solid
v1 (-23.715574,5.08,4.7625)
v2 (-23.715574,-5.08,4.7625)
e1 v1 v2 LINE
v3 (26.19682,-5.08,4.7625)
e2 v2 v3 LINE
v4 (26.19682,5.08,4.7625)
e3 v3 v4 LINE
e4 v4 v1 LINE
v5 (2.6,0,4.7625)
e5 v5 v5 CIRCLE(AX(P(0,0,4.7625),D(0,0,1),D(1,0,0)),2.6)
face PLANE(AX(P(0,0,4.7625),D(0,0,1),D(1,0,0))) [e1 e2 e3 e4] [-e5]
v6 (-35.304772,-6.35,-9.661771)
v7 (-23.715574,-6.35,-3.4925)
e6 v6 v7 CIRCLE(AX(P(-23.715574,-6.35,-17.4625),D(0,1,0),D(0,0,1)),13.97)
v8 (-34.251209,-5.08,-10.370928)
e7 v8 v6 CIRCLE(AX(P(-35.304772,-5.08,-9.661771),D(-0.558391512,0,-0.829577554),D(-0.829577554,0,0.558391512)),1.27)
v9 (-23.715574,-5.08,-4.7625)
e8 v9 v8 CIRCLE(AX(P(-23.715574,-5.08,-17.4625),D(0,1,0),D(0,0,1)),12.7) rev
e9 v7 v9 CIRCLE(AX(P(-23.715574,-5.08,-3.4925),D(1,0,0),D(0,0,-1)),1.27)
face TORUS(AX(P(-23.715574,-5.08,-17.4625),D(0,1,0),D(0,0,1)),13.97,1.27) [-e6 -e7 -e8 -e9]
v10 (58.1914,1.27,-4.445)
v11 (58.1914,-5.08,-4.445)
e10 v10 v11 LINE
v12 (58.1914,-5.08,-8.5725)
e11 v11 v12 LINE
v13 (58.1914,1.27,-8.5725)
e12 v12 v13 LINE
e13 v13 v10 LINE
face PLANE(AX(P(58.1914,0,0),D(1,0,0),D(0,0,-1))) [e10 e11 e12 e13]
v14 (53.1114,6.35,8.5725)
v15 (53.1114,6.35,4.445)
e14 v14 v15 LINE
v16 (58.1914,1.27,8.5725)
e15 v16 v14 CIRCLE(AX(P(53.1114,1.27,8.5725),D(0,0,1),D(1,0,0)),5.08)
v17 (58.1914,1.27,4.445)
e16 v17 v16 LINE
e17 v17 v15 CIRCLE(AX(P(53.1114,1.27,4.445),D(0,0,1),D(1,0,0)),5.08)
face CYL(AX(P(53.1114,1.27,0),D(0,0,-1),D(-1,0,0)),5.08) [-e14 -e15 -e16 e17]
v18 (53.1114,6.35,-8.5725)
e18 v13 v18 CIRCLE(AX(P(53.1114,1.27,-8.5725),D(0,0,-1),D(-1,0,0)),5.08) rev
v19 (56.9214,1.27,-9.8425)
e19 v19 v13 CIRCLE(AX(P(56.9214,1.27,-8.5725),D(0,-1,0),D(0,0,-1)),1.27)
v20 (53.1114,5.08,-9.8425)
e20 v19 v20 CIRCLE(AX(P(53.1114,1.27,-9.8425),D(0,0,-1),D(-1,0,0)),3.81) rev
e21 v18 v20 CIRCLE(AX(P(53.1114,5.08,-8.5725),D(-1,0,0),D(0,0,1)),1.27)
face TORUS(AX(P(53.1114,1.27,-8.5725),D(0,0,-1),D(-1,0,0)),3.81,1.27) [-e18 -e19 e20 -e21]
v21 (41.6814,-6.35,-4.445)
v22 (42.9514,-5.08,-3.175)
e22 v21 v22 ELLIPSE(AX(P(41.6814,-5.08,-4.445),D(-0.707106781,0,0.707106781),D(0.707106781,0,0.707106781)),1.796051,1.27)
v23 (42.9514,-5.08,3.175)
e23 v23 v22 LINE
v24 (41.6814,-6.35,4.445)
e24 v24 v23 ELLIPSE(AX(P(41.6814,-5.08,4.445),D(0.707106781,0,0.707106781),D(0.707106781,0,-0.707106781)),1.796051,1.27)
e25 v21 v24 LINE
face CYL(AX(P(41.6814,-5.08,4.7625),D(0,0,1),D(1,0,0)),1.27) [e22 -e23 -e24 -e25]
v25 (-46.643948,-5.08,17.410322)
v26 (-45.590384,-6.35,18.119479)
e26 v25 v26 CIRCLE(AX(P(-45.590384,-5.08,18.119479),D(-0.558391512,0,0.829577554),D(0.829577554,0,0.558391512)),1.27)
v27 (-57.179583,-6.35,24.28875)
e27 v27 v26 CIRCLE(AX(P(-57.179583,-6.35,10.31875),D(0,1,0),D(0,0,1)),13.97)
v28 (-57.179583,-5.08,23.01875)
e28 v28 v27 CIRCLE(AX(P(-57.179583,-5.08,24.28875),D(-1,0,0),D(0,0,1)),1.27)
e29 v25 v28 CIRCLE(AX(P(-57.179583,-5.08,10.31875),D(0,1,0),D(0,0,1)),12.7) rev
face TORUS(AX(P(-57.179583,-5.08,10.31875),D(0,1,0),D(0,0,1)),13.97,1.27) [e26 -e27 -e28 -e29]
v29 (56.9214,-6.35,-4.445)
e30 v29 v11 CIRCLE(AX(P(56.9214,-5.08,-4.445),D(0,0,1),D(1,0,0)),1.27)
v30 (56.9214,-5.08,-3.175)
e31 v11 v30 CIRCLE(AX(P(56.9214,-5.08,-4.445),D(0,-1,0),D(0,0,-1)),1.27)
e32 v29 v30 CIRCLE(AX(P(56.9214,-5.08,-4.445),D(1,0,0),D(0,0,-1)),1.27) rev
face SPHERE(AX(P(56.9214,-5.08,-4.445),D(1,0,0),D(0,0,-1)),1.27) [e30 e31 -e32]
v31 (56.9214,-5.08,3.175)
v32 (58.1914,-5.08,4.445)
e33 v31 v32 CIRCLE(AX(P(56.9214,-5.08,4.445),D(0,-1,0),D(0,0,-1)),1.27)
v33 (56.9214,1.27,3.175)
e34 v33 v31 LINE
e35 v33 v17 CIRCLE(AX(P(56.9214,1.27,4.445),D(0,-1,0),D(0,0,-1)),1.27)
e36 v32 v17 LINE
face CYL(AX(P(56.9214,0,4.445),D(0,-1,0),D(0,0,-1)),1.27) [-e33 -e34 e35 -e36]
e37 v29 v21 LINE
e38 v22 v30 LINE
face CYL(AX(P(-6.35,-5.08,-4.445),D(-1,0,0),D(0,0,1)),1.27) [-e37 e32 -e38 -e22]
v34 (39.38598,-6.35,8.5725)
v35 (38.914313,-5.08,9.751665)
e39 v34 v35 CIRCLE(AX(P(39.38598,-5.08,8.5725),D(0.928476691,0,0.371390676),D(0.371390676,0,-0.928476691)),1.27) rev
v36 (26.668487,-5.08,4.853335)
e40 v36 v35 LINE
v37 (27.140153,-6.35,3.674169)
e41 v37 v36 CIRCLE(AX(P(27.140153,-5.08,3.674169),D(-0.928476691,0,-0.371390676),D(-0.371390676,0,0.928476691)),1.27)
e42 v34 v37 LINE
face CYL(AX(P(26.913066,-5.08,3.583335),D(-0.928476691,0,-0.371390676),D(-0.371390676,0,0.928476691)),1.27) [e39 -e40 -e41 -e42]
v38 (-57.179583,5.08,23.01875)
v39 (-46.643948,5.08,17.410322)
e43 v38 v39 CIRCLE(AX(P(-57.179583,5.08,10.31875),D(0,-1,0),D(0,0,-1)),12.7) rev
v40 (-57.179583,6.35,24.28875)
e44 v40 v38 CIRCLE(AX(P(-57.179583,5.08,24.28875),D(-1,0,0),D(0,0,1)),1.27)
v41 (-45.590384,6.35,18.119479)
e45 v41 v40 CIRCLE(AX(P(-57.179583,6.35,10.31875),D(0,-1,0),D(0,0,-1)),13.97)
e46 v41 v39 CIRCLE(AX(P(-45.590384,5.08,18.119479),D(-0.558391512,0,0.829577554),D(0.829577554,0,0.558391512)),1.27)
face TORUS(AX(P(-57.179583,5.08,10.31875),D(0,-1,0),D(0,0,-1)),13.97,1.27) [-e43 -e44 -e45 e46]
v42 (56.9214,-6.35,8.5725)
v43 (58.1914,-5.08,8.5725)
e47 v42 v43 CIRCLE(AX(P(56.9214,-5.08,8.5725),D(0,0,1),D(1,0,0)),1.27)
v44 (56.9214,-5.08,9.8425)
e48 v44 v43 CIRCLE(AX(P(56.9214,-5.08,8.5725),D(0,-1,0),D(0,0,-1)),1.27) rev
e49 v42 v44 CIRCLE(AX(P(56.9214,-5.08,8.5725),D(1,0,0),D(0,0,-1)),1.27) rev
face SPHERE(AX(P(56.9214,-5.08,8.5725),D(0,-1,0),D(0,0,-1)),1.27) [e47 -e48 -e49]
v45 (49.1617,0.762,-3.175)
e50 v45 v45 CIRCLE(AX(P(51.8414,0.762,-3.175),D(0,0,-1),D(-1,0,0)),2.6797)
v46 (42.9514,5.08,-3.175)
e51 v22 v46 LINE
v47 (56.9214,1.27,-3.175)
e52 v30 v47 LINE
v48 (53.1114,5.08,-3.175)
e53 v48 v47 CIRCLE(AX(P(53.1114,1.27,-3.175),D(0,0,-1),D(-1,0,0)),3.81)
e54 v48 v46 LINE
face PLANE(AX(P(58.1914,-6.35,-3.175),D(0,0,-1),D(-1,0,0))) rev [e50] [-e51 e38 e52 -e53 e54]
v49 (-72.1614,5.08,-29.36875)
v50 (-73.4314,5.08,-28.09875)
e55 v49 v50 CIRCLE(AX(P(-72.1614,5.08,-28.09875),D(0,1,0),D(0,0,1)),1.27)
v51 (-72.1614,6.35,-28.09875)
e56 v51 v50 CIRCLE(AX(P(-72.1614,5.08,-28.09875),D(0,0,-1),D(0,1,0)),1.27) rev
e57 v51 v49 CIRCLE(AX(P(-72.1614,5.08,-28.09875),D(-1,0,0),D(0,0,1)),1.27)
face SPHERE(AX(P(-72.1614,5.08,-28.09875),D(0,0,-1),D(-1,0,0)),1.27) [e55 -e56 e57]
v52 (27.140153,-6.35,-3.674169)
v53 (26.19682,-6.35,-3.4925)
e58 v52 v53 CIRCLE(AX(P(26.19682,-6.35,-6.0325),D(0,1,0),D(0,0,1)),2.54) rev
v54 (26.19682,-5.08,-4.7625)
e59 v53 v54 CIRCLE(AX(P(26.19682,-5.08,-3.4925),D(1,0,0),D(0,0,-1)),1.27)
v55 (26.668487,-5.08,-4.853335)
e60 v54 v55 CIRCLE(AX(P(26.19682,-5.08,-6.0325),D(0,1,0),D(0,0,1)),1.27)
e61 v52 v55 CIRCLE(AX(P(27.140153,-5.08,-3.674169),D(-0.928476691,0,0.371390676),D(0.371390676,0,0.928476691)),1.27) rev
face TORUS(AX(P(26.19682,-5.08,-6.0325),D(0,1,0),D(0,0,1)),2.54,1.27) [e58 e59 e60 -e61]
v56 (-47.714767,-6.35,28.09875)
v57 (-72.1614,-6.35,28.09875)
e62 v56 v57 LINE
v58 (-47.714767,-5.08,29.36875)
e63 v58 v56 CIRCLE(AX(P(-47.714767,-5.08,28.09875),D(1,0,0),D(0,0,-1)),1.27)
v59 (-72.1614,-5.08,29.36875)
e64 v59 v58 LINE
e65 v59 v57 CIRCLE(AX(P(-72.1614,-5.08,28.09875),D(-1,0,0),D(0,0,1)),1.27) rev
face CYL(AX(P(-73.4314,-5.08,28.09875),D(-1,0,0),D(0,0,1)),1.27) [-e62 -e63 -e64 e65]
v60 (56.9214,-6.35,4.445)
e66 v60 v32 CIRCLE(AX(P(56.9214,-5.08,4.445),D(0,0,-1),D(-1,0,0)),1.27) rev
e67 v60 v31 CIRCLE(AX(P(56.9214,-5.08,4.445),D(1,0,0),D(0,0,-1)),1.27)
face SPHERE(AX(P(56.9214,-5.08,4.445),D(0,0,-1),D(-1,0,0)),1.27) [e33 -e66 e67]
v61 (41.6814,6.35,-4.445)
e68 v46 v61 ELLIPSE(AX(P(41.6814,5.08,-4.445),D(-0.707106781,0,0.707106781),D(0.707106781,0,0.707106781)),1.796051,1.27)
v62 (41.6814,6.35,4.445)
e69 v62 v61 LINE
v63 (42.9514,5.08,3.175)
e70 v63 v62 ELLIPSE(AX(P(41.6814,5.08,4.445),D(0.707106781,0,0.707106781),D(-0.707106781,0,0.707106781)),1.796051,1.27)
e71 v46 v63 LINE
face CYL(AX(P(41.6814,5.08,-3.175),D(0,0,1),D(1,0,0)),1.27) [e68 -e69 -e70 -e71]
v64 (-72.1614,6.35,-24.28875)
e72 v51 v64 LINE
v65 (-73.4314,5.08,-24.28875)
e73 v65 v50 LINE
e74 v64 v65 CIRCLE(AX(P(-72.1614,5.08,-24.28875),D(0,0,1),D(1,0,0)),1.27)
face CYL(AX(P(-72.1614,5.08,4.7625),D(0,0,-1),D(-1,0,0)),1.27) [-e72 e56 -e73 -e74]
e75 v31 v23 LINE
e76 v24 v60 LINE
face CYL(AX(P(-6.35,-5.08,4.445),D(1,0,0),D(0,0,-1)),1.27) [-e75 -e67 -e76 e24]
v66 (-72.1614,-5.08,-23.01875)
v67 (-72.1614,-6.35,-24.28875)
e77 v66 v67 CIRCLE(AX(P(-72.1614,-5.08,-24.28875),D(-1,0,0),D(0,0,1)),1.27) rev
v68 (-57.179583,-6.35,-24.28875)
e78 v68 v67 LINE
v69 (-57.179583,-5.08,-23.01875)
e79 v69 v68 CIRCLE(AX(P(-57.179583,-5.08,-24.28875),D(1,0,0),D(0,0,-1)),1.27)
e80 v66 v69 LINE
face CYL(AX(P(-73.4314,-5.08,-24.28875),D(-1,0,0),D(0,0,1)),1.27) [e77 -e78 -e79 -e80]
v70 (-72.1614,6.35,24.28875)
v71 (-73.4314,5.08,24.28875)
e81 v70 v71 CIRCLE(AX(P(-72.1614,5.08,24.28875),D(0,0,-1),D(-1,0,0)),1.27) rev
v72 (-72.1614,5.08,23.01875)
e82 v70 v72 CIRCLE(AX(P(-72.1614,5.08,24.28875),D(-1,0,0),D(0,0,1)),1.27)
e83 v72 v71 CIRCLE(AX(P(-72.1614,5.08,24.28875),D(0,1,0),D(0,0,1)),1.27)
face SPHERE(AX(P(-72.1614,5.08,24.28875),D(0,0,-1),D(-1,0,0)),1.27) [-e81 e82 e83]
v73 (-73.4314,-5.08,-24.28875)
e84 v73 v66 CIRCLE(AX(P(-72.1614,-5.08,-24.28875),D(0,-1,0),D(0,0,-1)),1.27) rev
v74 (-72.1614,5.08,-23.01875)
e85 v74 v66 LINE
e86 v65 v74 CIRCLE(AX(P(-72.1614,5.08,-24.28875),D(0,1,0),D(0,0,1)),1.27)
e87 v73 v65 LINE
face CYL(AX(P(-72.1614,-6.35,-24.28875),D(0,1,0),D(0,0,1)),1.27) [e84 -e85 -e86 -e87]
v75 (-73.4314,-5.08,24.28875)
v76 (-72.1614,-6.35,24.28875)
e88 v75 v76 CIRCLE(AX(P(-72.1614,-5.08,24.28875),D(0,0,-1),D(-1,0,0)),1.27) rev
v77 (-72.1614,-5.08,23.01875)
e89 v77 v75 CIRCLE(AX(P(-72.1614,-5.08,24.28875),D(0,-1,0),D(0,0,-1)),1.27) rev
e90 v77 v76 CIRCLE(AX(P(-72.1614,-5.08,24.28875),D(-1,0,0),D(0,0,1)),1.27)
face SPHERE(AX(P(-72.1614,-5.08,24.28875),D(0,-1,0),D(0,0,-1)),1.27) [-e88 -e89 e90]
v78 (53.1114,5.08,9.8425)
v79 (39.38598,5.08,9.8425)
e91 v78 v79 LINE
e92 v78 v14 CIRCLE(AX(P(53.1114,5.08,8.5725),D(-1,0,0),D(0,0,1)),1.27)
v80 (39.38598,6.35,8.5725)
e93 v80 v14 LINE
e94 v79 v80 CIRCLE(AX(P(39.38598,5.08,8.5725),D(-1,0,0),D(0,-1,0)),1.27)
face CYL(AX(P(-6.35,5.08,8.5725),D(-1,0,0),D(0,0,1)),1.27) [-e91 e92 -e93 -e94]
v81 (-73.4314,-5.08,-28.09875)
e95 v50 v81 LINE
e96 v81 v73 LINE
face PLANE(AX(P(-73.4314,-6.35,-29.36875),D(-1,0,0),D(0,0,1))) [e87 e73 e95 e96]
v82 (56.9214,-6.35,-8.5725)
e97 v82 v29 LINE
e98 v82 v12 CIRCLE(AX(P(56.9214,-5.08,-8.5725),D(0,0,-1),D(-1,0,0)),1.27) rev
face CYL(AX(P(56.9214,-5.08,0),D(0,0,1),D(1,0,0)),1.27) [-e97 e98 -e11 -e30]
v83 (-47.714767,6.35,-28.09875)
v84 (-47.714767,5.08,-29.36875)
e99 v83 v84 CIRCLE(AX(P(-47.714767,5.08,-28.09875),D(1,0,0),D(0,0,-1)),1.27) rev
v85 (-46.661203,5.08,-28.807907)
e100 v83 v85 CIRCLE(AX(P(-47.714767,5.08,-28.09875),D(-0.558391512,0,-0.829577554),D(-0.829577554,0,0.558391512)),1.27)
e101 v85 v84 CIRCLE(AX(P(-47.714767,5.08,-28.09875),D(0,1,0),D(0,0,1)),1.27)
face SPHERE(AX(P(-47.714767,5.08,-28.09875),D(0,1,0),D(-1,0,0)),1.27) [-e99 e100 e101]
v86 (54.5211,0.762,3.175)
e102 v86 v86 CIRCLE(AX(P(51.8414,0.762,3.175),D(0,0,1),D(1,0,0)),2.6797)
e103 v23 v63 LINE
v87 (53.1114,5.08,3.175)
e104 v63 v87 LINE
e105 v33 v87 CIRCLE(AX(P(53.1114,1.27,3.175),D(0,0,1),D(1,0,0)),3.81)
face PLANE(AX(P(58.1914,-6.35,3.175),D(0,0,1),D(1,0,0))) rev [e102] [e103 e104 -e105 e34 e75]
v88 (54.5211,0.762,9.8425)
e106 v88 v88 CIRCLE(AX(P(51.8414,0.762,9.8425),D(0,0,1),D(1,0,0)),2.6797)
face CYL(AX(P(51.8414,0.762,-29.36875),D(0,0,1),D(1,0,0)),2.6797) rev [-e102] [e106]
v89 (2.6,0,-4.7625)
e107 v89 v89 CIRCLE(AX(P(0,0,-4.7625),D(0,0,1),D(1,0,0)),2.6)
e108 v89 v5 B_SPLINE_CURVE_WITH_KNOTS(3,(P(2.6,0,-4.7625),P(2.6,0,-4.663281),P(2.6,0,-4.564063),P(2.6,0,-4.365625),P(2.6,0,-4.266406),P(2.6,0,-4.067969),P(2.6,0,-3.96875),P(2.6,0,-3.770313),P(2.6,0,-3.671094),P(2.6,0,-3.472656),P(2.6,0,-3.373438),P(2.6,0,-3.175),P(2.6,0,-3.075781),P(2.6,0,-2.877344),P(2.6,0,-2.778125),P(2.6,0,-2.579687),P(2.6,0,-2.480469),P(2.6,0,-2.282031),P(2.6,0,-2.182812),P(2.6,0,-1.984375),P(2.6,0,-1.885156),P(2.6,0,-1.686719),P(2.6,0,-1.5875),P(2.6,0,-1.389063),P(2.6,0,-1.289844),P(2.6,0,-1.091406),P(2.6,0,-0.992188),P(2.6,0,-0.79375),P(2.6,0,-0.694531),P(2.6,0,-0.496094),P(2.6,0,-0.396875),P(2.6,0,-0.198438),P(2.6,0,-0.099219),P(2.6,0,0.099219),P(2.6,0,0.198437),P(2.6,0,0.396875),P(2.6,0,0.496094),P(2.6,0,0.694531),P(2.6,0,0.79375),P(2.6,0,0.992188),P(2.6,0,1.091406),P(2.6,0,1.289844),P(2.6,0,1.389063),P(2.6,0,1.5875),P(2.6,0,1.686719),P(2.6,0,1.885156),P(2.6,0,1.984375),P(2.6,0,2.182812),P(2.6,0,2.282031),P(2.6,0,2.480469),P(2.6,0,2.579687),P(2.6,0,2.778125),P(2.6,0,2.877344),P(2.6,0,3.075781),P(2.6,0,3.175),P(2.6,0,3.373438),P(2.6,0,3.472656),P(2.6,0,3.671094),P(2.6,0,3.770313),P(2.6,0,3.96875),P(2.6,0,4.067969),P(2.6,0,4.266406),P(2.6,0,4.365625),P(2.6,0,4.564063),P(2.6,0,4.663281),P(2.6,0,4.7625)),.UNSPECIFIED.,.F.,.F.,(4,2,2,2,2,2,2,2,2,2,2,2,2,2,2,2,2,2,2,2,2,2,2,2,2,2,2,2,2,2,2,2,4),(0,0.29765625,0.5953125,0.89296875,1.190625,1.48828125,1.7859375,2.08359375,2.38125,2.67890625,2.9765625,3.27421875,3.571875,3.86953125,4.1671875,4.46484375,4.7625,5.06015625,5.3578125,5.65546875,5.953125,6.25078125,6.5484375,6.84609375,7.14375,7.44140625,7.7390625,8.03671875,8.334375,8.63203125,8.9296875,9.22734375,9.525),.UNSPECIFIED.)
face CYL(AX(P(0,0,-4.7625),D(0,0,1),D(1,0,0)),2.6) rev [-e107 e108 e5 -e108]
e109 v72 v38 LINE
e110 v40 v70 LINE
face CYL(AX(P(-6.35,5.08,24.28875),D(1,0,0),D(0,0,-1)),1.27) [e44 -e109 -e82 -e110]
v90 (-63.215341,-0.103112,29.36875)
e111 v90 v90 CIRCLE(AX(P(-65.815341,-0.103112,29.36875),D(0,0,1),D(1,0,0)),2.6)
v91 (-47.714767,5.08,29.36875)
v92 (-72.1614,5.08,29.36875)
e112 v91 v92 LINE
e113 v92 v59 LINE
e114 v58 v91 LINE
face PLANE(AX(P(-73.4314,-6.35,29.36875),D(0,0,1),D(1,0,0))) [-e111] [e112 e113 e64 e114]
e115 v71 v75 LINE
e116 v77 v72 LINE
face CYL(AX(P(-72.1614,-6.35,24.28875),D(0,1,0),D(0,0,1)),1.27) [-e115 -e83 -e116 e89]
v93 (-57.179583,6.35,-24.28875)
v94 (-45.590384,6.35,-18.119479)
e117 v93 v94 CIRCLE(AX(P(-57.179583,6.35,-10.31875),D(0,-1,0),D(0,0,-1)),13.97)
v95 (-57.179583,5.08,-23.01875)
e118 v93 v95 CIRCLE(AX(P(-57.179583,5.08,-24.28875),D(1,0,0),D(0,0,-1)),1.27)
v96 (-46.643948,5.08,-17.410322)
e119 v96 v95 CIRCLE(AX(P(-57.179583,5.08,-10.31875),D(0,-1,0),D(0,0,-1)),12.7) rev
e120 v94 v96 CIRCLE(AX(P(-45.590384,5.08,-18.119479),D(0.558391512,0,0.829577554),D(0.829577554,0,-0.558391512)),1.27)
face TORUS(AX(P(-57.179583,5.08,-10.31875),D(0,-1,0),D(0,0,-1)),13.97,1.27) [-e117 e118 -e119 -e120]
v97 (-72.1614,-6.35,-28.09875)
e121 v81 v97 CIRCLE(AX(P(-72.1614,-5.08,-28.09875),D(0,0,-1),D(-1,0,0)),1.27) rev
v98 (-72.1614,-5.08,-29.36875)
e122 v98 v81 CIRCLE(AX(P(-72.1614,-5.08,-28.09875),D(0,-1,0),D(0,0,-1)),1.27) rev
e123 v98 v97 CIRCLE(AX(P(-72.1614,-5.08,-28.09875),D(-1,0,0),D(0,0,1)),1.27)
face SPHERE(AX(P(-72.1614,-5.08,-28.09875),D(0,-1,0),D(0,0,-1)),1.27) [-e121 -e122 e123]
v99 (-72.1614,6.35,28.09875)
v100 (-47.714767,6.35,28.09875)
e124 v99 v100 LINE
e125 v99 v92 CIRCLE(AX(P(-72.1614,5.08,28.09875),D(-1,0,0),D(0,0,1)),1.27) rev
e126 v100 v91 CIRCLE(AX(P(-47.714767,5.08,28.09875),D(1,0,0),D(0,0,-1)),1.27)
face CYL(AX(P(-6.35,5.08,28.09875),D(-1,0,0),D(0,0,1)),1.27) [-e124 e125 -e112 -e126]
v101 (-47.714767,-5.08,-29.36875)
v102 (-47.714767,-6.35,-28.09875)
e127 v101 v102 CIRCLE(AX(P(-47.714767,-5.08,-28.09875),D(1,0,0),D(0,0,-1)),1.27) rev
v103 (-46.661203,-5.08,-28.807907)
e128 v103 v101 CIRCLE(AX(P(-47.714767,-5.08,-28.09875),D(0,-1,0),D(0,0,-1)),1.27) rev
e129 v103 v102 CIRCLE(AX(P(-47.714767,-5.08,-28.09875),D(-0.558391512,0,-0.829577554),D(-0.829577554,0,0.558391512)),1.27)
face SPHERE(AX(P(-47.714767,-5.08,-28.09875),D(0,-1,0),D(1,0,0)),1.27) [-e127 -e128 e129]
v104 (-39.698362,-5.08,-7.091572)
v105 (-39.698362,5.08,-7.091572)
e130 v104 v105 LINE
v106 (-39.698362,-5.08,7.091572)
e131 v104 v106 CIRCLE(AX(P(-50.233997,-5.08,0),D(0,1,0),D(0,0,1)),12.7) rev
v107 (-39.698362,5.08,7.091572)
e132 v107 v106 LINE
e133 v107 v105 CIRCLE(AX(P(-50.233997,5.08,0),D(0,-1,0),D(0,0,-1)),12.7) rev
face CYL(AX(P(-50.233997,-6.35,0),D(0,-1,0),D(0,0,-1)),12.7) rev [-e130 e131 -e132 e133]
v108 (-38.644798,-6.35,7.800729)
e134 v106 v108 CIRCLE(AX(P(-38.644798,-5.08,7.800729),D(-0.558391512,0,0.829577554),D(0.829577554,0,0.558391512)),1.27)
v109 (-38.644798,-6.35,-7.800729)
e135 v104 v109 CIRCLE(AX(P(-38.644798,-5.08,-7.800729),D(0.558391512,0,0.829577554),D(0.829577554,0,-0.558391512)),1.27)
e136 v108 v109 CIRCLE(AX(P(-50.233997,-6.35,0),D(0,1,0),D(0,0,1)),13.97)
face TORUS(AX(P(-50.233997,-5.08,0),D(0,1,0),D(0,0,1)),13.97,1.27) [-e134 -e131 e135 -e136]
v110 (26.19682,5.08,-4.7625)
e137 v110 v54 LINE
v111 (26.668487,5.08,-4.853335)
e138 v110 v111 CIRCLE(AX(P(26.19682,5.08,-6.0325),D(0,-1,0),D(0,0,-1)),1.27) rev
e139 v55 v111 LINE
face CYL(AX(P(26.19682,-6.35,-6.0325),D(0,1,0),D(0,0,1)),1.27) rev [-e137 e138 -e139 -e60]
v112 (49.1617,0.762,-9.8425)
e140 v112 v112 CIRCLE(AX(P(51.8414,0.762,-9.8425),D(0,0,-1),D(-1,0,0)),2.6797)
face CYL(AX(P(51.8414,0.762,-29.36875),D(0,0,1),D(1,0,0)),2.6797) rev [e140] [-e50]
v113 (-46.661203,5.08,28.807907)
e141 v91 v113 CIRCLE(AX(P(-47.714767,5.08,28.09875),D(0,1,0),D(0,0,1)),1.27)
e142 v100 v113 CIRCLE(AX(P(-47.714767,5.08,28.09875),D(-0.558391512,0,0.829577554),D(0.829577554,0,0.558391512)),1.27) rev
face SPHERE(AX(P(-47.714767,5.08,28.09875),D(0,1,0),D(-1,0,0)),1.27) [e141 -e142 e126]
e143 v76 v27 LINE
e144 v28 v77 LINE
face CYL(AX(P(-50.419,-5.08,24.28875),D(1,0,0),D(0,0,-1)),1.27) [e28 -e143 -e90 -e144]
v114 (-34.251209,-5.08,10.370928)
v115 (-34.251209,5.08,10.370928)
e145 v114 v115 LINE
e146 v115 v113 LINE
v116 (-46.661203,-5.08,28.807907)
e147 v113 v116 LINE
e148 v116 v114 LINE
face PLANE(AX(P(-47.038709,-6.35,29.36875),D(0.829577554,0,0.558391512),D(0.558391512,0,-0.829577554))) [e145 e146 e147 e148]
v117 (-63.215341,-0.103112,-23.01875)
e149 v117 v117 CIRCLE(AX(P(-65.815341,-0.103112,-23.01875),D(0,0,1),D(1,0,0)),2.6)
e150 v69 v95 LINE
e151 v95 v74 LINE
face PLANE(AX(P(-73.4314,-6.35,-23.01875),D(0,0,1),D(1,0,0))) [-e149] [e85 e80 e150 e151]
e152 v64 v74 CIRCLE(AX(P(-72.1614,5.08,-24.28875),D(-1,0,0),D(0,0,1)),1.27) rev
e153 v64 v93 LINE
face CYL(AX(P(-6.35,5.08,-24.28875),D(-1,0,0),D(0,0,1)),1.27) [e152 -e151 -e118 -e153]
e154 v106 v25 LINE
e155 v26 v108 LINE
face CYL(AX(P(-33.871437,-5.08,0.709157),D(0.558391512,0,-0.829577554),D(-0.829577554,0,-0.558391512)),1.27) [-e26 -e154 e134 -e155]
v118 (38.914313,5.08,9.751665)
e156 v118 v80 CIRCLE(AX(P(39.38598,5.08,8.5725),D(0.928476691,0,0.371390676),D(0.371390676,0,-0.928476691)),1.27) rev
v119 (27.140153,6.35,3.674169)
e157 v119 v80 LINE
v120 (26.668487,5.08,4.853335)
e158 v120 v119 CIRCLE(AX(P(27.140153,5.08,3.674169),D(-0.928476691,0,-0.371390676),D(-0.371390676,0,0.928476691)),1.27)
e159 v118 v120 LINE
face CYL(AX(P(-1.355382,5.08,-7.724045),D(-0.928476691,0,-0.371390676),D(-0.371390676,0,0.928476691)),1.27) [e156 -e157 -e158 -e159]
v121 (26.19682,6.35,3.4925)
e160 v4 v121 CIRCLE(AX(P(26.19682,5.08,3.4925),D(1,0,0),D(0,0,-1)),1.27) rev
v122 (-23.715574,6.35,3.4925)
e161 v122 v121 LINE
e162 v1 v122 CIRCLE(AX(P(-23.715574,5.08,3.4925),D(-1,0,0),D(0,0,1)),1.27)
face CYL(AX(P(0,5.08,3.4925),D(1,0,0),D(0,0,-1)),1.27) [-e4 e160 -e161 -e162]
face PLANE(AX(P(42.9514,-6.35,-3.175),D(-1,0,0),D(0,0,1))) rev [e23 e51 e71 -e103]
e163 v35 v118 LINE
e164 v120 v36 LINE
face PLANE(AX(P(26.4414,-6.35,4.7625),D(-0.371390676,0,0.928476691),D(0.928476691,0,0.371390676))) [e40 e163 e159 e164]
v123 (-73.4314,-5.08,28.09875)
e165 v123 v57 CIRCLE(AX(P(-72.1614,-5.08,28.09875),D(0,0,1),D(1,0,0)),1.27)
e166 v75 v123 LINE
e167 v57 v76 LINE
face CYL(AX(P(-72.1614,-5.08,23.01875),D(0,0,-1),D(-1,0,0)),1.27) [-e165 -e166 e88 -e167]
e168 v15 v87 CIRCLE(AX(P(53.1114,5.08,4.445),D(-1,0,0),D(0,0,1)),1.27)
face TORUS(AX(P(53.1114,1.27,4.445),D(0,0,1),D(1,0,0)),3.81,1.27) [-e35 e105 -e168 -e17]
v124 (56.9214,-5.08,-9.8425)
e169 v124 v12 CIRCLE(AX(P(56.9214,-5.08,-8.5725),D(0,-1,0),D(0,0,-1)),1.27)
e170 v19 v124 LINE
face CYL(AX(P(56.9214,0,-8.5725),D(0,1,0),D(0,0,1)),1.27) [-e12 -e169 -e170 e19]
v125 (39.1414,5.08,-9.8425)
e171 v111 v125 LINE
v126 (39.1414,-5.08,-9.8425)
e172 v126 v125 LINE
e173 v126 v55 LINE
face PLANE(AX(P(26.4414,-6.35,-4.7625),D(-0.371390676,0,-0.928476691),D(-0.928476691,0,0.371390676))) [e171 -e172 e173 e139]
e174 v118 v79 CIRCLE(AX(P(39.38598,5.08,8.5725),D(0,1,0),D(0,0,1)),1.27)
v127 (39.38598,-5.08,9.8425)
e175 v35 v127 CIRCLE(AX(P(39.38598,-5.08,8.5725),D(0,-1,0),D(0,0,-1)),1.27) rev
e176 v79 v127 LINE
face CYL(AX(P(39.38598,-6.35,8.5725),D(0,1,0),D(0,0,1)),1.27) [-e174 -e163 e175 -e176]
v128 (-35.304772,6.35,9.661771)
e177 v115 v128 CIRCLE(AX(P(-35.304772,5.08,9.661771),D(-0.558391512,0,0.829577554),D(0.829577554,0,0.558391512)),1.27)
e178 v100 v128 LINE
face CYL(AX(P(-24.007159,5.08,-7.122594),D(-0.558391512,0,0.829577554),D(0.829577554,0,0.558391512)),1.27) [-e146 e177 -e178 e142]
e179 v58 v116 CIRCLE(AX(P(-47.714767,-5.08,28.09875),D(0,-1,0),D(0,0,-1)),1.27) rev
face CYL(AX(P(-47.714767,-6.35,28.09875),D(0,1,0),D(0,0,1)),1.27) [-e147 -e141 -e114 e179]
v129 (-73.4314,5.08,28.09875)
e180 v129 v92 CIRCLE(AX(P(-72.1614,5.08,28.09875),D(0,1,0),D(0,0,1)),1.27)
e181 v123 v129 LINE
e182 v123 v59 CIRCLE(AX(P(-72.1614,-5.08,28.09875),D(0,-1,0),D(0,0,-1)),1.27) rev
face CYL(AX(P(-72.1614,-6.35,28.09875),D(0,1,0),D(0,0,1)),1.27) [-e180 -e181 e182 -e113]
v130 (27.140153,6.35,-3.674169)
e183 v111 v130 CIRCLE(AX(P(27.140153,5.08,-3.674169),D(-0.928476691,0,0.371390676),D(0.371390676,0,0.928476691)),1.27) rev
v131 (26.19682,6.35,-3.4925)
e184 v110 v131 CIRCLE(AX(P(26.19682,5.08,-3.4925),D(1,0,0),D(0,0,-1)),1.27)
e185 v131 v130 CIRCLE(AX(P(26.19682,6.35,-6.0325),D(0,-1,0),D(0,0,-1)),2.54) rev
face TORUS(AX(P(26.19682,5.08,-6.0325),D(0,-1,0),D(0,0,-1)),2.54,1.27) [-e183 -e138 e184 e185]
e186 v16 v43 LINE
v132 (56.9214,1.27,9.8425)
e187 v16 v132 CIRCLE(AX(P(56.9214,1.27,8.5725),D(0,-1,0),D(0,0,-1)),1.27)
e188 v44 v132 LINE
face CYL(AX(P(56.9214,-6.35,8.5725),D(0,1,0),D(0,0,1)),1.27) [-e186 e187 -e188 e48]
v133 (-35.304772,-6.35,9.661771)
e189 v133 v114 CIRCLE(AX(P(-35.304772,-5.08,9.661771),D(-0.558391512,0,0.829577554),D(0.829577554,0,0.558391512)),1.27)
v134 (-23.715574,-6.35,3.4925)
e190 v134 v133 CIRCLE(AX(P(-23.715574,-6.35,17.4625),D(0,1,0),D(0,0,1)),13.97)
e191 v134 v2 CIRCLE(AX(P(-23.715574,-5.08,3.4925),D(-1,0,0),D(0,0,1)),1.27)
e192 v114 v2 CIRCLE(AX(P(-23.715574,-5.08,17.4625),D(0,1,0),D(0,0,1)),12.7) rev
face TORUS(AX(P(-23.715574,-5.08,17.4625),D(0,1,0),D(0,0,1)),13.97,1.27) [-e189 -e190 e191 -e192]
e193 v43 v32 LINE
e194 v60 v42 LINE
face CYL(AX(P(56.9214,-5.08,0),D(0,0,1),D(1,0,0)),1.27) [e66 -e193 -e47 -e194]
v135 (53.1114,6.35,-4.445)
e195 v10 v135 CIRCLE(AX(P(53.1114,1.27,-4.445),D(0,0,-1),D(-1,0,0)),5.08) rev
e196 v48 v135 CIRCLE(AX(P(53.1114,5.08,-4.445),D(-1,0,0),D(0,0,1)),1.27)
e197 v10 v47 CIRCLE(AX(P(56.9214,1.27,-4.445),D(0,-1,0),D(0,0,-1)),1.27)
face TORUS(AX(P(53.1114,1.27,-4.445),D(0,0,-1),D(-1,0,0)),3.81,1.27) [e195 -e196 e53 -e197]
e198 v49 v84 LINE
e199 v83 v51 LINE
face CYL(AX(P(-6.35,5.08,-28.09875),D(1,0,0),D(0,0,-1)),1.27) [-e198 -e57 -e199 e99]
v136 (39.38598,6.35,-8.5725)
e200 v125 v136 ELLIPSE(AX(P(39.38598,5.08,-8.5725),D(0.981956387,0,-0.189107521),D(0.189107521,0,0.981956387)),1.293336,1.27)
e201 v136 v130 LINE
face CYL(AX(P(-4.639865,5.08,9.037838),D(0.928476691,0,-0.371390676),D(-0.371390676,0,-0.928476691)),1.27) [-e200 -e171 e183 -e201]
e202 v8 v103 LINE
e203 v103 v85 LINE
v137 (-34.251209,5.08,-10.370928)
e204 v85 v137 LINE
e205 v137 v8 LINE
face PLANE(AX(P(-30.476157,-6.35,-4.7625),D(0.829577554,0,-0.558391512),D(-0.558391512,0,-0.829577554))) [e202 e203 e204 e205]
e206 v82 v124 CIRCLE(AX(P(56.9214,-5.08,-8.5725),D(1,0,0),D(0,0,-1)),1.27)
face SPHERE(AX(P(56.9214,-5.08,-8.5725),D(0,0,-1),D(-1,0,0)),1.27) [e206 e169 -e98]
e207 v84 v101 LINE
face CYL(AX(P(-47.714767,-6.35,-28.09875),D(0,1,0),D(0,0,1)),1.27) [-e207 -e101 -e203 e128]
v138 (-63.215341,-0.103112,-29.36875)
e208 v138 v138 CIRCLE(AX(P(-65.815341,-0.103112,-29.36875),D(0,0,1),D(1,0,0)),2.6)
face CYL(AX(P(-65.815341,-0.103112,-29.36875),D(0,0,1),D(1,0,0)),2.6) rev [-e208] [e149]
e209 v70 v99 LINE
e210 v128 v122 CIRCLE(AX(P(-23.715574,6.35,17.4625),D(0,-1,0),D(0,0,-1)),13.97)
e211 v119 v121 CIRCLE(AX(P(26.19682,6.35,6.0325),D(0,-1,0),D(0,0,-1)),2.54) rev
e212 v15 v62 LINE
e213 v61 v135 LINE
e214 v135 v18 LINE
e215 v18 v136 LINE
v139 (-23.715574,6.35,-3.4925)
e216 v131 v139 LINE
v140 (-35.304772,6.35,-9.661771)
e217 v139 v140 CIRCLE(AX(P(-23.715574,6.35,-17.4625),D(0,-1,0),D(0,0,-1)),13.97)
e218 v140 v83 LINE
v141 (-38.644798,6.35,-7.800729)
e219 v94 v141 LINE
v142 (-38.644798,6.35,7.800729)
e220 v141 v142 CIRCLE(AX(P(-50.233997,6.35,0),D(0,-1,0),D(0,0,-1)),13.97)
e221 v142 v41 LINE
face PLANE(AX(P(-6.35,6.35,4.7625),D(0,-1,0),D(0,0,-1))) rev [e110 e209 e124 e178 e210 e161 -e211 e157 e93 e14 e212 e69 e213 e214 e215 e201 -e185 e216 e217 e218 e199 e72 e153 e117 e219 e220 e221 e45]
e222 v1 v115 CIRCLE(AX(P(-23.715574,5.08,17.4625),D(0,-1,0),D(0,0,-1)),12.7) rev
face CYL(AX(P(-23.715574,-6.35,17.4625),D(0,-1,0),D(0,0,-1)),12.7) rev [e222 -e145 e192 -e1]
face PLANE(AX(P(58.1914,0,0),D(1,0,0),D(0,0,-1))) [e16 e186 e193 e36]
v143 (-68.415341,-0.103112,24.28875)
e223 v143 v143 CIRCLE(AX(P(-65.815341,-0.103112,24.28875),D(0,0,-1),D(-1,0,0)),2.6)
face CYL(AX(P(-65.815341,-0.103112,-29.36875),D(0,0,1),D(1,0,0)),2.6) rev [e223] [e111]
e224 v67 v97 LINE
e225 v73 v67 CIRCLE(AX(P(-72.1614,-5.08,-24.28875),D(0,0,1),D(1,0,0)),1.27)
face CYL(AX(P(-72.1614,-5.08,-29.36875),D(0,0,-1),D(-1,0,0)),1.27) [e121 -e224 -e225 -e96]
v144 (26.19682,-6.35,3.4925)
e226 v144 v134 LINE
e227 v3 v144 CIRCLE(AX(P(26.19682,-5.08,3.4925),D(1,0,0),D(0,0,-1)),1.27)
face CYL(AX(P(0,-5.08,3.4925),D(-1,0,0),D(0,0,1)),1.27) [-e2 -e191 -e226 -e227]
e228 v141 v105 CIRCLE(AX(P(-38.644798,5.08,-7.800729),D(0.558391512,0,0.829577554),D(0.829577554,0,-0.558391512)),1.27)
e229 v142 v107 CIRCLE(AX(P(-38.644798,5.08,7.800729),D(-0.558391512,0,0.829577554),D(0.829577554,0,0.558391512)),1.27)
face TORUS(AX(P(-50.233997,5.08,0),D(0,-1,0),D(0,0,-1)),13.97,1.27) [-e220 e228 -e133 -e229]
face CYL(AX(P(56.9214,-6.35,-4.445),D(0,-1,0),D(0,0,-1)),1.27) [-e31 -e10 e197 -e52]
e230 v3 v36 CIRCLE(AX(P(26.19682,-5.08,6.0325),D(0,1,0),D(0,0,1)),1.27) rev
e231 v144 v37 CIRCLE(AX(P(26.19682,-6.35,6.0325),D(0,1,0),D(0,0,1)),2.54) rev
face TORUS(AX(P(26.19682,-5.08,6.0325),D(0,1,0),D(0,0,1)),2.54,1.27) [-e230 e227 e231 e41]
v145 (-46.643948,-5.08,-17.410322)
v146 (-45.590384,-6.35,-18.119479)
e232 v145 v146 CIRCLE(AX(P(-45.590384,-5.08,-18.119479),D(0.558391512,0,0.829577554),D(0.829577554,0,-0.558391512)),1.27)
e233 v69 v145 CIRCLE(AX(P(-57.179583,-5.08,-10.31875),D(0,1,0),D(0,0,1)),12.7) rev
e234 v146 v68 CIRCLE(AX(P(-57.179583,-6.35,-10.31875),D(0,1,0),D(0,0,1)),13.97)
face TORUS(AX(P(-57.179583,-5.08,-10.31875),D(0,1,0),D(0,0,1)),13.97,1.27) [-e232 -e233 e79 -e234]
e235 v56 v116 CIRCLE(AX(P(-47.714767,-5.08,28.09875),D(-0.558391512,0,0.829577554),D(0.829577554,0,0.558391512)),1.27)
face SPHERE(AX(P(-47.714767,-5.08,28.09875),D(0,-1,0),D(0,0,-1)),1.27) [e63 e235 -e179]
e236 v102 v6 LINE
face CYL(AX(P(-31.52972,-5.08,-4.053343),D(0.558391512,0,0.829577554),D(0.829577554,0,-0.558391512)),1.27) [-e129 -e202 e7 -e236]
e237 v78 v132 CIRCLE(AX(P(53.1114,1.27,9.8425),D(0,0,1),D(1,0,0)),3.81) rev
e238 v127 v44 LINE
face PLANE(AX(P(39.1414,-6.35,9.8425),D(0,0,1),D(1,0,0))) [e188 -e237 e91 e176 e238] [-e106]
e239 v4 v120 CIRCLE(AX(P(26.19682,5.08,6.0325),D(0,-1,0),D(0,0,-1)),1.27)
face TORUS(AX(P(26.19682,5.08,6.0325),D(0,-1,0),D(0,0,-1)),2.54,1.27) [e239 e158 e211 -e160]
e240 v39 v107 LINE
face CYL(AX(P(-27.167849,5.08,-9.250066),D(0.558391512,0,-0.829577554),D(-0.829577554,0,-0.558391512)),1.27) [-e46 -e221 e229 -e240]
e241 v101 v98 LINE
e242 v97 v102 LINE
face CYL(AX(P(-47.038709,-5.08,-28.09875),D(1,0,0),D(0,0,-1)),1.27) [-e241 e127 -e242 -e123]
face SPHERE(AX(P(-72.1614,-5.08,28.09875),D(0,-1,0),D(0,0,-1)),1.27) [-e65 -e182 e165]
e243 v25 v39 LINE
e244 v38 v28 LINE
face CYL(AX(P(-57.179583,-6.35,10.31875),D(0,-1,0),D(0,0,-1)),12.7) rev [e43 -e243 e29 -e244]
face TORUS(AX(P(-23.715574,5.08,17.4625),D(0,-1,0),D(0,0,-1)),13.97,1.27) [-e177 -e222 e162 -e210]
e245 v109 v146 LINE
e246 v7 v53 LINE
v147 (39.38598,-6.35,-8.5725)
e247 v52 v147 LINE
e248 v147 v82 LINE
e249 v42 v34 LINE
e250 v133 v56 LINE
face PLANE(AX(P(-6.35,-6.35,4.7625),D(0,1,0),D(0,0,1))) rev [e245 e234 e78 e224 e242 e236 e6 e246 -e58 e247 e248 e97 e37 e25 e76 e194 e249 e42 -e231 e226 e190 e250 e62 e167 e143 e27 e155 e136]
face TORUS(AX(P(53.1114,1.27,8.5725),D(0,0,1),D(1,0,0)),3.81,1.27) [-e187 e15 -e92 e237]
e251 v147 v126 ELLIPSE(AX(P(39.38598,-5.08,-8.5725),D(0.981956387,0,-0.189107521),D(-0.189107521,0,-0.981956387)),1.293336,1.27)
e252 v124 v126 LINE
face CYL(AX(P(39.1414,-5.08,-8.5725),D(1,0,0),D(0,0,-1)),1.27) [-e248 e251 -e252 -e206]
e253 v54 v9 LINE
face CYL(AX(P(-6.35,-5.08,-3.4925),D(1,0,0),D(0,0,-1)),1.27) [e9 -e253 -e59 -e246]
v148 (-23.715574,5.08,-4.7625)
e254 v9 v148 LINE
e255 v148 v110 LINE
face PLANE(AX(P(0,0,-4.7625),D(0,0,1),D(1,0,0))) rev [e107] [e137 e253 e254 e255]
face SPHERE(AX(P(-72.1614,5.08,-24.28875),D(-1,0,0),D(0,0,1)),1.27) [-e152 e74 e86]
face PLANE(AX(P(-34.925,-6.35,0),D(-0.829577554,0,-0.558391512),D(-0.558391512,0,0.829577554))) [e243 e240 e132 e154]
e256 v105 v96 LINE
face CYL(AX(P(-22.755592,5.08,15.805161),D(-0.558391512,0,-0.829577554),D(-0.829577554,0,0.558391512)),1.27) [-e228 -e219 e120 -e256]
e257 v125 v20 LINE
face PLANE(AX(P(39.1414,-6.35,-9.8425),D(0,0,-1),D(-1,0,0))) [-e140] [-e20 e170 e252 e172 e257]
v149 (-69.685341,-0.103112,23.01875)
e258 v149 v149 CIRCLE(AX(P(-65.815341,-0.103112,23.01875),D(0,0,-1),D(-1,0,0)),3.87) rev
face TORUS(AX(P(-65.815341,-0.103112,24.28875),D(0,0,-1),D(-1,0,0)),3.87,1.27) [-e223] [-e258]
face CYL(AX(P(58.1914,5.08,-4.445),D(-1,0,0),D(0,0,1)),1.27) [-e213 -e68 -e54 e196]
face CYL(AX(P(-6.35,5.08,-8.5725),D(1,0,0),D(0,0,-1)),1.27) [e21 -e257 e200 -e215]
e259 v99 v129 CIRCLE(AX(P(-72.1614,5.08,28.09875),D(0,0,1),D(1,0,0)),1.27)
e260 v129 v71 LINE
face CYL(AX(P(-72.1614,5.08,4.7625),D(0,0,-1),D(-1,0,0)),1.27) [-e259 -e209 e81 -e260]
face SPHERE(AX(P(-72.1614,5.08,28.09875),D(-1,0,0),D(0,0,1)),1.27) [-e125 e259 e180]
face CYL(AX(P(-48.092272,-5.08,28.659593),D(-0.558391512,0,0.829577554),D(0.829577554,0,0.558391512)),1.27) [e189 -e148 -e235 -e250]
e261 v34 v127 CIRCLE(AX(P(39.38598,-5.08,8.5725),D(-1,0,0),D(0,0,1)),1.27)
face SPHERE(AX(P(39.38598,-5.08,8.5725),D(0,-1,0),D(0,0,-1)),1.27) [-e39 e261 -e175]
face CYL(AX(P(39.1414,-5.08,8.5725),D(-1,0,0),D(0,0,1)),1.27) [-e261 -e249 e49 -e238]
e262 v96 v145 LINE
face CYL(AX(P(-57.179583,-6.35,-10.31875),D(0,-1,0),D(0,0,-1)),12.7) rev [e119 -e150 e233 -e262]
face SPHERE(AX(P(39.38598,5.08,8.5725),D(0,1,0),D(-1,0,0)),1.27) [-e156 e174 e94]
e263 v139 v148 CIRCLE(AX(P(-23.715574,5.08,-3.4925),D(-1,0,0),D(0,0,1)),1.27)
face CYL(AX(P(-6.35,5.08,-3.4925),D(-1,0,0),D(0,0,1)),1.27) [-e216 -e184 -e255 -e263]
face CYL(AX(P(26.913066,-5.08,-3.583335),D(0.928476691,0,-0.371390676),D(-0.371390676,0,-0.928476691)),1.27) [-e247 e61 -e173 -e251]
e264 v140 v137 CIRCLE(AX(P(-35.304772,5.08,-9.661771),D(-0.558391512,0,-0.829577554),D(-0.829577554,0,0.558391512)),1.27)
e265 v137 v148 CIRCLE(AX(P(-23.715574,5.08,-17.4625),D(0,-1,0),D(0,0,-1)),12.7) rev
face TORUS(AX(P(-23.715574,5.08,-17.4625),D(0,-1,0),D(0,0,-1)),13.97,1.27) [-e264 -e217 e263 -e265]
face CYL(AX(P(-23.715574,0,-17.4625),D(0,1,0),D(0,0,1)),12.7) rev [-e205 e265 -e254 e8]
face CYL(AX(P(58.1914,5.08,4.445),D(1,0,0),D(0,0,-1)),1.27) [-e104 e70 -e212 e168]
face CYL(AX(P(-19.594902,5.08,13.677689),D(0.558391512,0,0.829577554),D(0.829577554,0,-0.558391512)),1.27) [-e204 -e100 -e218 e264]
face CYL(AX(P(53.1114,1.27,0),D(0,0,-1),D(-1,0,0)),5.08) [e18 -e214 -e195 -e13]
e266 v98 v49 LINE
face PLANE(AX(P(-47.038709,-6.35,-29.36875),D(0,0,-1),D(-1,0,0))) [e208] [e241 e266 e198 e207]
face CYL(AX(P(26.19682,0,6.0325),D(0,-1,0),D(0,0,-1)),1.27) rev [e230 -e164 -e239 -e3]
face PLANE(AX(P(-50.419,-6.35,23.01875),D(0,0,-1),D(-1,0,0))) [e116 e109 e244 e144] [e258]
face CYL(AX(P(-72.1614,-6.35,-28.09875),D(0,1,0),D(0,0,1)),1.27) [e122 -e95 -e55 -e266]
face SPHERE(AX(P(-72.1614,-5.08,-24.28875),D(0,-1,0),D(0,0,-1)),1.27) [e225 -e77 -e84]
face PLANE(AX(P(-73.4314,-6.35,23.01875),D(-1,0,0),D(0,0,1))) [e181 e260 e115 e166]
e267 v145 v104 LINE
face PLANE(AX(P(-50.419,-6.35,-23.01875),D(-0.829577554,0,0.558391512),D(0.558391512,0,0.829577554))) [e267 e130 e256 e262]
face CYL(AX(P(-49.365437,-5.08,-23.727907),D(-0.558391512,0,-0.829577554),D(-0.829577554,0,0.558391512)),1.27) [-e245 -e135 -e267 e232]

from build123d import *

# Parameters (mm, degrees)
ESQUISSE1_W             = 12.7
ESQUISSE1_H             = 12.7
BOSS_EXTRU_1_DEPTH      = 4.7625
ESQUISSE2_R             = 2.6
ENL_V_MAT_EXTRU_1_DEPTH = 14.090860361
ESQUISSE4_W             = 9.525
ESQUISSE4_H             = 12.7
BOSS_EXTRU_3_DEPTH      = 51.8414
ESQUISSE6_W             = 15.24
ESQUISSE6_H             = 6.35
ENL_V_MAT_EXTRU_3_DEPTH = 60.751237981
ESQUISSE7_W             = 9.525
ESQUISSE7_H             = 12.7
BOSS_EXTRU_4_DEPTH      = 28.575
BOSS_EXTRU_5_DEPTH      = 12.7
ESQUISSE10_R            = 2.6
ENL_V_MAT_EXTRU_4_DEPTH = 95.247476954
BOSS_EXTRU_6_DEPTH      = 12.7
ESQUISSE5_R             = 2.6797
ENL_V_MAT_EXTRU_2_DEPTH = 84.486616487
CONG_1_R                = 12.7
CONG_2_R                = 1.27
CONG_3_R                = 5.08


with BuildPart() as part:
    # Esquisse1 → Boss.-Extru.1 (new, symmetric)
    with BuildSketch(Plane.XY):
        Rectangle(ESQUISSE1_W, ESQUISSE1_H)
    extrude(amount=BOSS_EXTRU_1_DEPTH, both=True)

    # Esquisse2 → Enlèv. mat.-Extru.1 (cut, through all)
    with BuildSketch(Plane.XY.offset(4.7625)):
        Circle(ESQUISSE2_R)
    extrude(amount=-ENL_V_MAT_EXTRU_1_DEPTH, mode=Mode.SUBTRACT)

    # Esquisse4 → Boss.-Extru.3 (add)
    with BuildSketch(Plane(origin=(6.35, 0, 0), x_dir=(0, 0, -1), z_dir=(1, 0, 0))):
        Rectangle(ESQUISSE4_W, ESQUISSE4_H)
    extrude(amount=BOSS_EXTRU_3_DEPTH)

    # Esquisse6 → Enlèv. mat.-Extru.3 (cut, through all)
    with BuildSketch(Plane(origin=(0, 6.35, 0), x_dir=(1, 0, 0), z_dir=(0, 1, 0))):
        with Locations((50.5714, 0)):
            Rectangle(ESQUISSE6_W, ESQUISSE6_H)
    extrude(amount=-ENL_V_MAT_EXTRU_3_DEPTH, mode=Mode.SUBTRACT)

    # Esquisse7 → Boss.-Extru.4 (add)
    with BuildSketch(Plane.ZY.offset(6.35)):
        Rectangle(ESQUISSE7_W, ESQUISSE7_H)
    extrude(amount=BOSS_EXTRU_4_DEPTH)

    # Esquisse8 → Boss.-Extru.5 (add)
    with BuildSketch(Plane(origin=(0, 6.35, 0), x_dir=(1, 0, 0), z_dir=(0, 1, 0))):
        Polygon((-30.476156848, 4.7625), (-47.038708572, 29.36875), (-73.4314, 29.36875), (-73.4314, 23.01875), (-50.419, 23.01875), (-34.925, 0), (-50.419, -23.01875), (-73.4314, -23.01875), (-73.4314, -29.36875), (-47.038708572, -29.36875), (-30.476156848, -4.7625), align=None)
    extrude(amount=-BOSS_EXTRU_5_DEPTH)

    # Esquisse10 → Enlèv. mat.-Extru.4 (cut, through all)
    with BuildSketch(Plane.XY.offset(29.36875)):
        with Locations((-65.81534116, -0.103112023)):
            Circle(ESQUISSE10_R)
    extrude(amount=-ENL_V_MAT_EXTRU_4_DEPTH, mode=Mode.SUBTRACT)

    # Esquisse11 → Boss.-Extru.6 (add)
    with BuildSketch(Plane(origin=(0, 6.35, 0), x_dir=(1, 0, 0), z_dir=(0, 1, 0))):
        Polygon((58.1914, 9.8425), (58.1914, 4.7625), (26.4414, 4.7625), (39.1414, 9.8425), align=None)
        Polygon((26.4414, -4.7625), (39.1414, -9.8425), (58.1914, -9.8425), (58.1914, -4.7625), align=None)
    extrude(amount=-BOSS_EXTRU_6_DEPTH)

    # Esquisse5 → Enlèv. mat.-Extru.2 (cut, through all)
    with BuildSketch(Plane.XY.offset(9.8425)):
        with Locations((51.8414, 0.762)):
            Circle(ESQUISSE5_R)
    extrude(amount=-ENL_V_MAT_EXTRU_2_DEPTH, mode=Mode.SUBTRACT)

    # Congé1
    cong_1_edges = [part.edges().sort_by_distance(p)[0] for p in [
        (-30.476156848, 0, -4.7625),
        (-30.476156848, 0, 4.7625),
        (-50.419, 0, 23.01875),
        (-34.925, 0, 0),
        (-50.419, 0, -23.01875),
    ]]
    fillet(cong_1_edges, radius=CONG_1_R)

    # Congé2
    cong_2_edges = [part.edges().sort_by_distance(p)[0] for p in [
        (1.362913003, 6.35, -4.7625),
        (32.7914, -6.35, -7.3025),
        (26.4414, 0, -4.7625),
        (48.6664, -6.35, -9.8425),
        (58.1914, 0, -9.8425),
        (32.7914, 6.35, -7.3025),
        (48.6664, 6.35, -9.8425),
        (1.362913003, 6.35, 4.7625),
        (26.4414, 0, 4.7625),
        (48.6664, -6.35, 9.8425),
        (58.1914, 0, 9.8425),
        (32.7914, -6.35, 7.3025),
        (39.1414, 0, 9.8425),
        (32.7914, 6.35, 7.3025),
        (48.6664, 6.35, 9.8425),
        (-43.171154811, 6.35, -12.250947209),
        (-43.171154811, -6.35, -12.250947209),
        (-43.171154811, 6.35, 12.250947209),
        (-43.171154811, -6.35, 12.250947209),
        (-65.305491428, 6.35, 23.01875),
        (-65.305491428, -6.35, 23.01875),
        (1.362913003, -6.35, -4.7625),
        (-40.644958753, 6.35, -19.869838896),
        (-40.644958753, -6.35, -19.869838896),
        (1.362913003, -6.35, 4.7625),
        (-51.211876723, 6.35, -21.529302329),
        (-51.211876723, -6.35, -21.529302329),
        (-51.211876723, 6.35, 21.529302329),
        (-51.211876723, -6.35, 21.529302329),
        (-37.533996648, 6.35, 0),
        (-37.533996648, -6.35, 0),
        (-29.683280125, 6.35, -6.251947671),
        (-29.683280125, -6.35, -6.251947671),
        (-29.683280125, 6.35, 6.251947671),
        (-29.683280125, -6.35, 6.251947671),
        (58.1914, -6.35, 6.50875),
        (58.1914, -6.35, -6.50875),
        (58.1914, 0, -3.175),
        (50.5714, -6.35, 3.175),
        (58.1914, 0, 3.175),
        (42.9514, -6.35, 0),
        (50.5714, -6.35, -3.175),
        (50.5714, 6.35, -3.175),
        (42.9514, 6.35, 0),
        (50.5714, 6.35, 3.175),
        (-60.235054286, 6.35, -29.36875),
        (-73.4314, 6.35, -26.19375),
        (-65.305491428, 6.35, -23.01875),
        (-40.644958753, -6.35, 19.869838896),
        (-60.235054286, -6.35, 29.36875),
        (-47.038708572, 0, 29.36875),
        (-73.4314, -6.35, 26.19375),
        (-73.4314, 0, 29.36875),
        (-73.4314, 0, 23.01875),
        (-65.305491428, -6.35, -23.01875),
        (-73.4314, -6.35, -26.19375),
        (-73.4314, 0, -23.01875),
        (-60.235054286, -6.35, -29.36875),
        (-73.4314, 0, -29.36875),
        (-47.038708572, 0, -29.36875),
        (-40.644958753, 6.35, 19.869838896),
        (-73.4314, 6.35, 26.19375),
        (-60.235054286, 6.35, 29.36875),
        (-68.41534116, -0.103112023, 23.01875),
    ]]
    fillet(cong_2_edges, radius=CONG_2_R)

    # Congé3
    # the kernel refuses this fillet: 5.08 mm, written as the material it takes off along each edge
    with BuildSketch(Plane(origin=(53.1114, 1.27, -9.8425), x_dir=(0, 1, 0), z_dir=(-1, 0, 0))) as cong_3_piece_1:
        with BuildLine():
            CenterArc((3.81, -1.27), 1.27, 0, 90)
            Line((5.08, -1.27), (5.08, 0))
            Line((5.08, 0), (3.81, 0))
        make_face()
    revolve(axis=Axis((53.1114, 1.27, -9.8425), (0, 0, -1)), revolution_arc=90, mode=Mode.SUBTRACT)
    with BuildSketch(Plane(origin=(53.1114, 1.27, -3.175), x_dir=(1, 0, 0), z_dir=(0, -1, 0))) as cong_3_piece_2:
        with BuildLine():
            CenterArc((3.81, -1.27), 1.27, 0, 90)
            Line((5.08, -1.27), (5.08, 0))
            Line((5.08, 0), (3.81, 0))
        make_face()
    revolve(axis=Axis((53.1114, 1.27, -3.175), (0, 0, 1)), revolution_arc=90, mode=Mode.SUBTRACT)
    with BuildSketch(Plane(origin=(53.1114, 1.27, 3.175), x_dir=(0, 1, 0), z_dir=(-1, 0, 0))) as cong_3_piece_3:
        with BuildLine():
            CenterArc((3.81, -1.27), 1.27, 0, 90)
            Line((5.08, -1.27), (5.08, 0))
            Line((5.08, 0), (3.81, 0))
        make_face()
    revolve(axis=Axis((53.1114, 1.27, 3.175), (0, 0, -1)), revolution_arc=90, mode=Mode.SUBTRACT)
    with BuildSketch(Plane(origin=(53.1114, 1.27, 9.8425), x_dir=(1, 0, 0), z_dir=(0, -1, 0))) as cong_3_piece_4:
        with BuildLine():
            CenterArc((3.81, -1.27), 1.27, 0, 90)
            Line((5.08, -1.27), (5.08, 0))
            Line((5.08, 0), (3.81, 0))
        make_face()
    revolve(axis=Axis((53.1114, 1.27, 9.8425), (0, 0, 1)), revolution_arc=90, mode=Mode.SUBTRACT)
    with BuildSketch(Plane(origin=(58.1914, 6.35, -3.175), x_dir=(-1, 0, 0), z_dir=(0, 0, -1)), Plane(origin=(58.1914, 6.35, 9.8425), x_dir=(-1, 0, 0), z_dir=(0, 0, -1))) as cong_3_piece_5:
        with BuildLine():
            CenterArc((CONG_3_R, -CONG_3_R), CONG_3_R, 90, 90)
            Line((0, -CONG_3_R), (0, 0))
            Line((0, 0), (CONG_3_R, 0))
        make_face()
    extrude(amount=6.6675, mode=Mode.SUBTRACT)


solid = part.part
